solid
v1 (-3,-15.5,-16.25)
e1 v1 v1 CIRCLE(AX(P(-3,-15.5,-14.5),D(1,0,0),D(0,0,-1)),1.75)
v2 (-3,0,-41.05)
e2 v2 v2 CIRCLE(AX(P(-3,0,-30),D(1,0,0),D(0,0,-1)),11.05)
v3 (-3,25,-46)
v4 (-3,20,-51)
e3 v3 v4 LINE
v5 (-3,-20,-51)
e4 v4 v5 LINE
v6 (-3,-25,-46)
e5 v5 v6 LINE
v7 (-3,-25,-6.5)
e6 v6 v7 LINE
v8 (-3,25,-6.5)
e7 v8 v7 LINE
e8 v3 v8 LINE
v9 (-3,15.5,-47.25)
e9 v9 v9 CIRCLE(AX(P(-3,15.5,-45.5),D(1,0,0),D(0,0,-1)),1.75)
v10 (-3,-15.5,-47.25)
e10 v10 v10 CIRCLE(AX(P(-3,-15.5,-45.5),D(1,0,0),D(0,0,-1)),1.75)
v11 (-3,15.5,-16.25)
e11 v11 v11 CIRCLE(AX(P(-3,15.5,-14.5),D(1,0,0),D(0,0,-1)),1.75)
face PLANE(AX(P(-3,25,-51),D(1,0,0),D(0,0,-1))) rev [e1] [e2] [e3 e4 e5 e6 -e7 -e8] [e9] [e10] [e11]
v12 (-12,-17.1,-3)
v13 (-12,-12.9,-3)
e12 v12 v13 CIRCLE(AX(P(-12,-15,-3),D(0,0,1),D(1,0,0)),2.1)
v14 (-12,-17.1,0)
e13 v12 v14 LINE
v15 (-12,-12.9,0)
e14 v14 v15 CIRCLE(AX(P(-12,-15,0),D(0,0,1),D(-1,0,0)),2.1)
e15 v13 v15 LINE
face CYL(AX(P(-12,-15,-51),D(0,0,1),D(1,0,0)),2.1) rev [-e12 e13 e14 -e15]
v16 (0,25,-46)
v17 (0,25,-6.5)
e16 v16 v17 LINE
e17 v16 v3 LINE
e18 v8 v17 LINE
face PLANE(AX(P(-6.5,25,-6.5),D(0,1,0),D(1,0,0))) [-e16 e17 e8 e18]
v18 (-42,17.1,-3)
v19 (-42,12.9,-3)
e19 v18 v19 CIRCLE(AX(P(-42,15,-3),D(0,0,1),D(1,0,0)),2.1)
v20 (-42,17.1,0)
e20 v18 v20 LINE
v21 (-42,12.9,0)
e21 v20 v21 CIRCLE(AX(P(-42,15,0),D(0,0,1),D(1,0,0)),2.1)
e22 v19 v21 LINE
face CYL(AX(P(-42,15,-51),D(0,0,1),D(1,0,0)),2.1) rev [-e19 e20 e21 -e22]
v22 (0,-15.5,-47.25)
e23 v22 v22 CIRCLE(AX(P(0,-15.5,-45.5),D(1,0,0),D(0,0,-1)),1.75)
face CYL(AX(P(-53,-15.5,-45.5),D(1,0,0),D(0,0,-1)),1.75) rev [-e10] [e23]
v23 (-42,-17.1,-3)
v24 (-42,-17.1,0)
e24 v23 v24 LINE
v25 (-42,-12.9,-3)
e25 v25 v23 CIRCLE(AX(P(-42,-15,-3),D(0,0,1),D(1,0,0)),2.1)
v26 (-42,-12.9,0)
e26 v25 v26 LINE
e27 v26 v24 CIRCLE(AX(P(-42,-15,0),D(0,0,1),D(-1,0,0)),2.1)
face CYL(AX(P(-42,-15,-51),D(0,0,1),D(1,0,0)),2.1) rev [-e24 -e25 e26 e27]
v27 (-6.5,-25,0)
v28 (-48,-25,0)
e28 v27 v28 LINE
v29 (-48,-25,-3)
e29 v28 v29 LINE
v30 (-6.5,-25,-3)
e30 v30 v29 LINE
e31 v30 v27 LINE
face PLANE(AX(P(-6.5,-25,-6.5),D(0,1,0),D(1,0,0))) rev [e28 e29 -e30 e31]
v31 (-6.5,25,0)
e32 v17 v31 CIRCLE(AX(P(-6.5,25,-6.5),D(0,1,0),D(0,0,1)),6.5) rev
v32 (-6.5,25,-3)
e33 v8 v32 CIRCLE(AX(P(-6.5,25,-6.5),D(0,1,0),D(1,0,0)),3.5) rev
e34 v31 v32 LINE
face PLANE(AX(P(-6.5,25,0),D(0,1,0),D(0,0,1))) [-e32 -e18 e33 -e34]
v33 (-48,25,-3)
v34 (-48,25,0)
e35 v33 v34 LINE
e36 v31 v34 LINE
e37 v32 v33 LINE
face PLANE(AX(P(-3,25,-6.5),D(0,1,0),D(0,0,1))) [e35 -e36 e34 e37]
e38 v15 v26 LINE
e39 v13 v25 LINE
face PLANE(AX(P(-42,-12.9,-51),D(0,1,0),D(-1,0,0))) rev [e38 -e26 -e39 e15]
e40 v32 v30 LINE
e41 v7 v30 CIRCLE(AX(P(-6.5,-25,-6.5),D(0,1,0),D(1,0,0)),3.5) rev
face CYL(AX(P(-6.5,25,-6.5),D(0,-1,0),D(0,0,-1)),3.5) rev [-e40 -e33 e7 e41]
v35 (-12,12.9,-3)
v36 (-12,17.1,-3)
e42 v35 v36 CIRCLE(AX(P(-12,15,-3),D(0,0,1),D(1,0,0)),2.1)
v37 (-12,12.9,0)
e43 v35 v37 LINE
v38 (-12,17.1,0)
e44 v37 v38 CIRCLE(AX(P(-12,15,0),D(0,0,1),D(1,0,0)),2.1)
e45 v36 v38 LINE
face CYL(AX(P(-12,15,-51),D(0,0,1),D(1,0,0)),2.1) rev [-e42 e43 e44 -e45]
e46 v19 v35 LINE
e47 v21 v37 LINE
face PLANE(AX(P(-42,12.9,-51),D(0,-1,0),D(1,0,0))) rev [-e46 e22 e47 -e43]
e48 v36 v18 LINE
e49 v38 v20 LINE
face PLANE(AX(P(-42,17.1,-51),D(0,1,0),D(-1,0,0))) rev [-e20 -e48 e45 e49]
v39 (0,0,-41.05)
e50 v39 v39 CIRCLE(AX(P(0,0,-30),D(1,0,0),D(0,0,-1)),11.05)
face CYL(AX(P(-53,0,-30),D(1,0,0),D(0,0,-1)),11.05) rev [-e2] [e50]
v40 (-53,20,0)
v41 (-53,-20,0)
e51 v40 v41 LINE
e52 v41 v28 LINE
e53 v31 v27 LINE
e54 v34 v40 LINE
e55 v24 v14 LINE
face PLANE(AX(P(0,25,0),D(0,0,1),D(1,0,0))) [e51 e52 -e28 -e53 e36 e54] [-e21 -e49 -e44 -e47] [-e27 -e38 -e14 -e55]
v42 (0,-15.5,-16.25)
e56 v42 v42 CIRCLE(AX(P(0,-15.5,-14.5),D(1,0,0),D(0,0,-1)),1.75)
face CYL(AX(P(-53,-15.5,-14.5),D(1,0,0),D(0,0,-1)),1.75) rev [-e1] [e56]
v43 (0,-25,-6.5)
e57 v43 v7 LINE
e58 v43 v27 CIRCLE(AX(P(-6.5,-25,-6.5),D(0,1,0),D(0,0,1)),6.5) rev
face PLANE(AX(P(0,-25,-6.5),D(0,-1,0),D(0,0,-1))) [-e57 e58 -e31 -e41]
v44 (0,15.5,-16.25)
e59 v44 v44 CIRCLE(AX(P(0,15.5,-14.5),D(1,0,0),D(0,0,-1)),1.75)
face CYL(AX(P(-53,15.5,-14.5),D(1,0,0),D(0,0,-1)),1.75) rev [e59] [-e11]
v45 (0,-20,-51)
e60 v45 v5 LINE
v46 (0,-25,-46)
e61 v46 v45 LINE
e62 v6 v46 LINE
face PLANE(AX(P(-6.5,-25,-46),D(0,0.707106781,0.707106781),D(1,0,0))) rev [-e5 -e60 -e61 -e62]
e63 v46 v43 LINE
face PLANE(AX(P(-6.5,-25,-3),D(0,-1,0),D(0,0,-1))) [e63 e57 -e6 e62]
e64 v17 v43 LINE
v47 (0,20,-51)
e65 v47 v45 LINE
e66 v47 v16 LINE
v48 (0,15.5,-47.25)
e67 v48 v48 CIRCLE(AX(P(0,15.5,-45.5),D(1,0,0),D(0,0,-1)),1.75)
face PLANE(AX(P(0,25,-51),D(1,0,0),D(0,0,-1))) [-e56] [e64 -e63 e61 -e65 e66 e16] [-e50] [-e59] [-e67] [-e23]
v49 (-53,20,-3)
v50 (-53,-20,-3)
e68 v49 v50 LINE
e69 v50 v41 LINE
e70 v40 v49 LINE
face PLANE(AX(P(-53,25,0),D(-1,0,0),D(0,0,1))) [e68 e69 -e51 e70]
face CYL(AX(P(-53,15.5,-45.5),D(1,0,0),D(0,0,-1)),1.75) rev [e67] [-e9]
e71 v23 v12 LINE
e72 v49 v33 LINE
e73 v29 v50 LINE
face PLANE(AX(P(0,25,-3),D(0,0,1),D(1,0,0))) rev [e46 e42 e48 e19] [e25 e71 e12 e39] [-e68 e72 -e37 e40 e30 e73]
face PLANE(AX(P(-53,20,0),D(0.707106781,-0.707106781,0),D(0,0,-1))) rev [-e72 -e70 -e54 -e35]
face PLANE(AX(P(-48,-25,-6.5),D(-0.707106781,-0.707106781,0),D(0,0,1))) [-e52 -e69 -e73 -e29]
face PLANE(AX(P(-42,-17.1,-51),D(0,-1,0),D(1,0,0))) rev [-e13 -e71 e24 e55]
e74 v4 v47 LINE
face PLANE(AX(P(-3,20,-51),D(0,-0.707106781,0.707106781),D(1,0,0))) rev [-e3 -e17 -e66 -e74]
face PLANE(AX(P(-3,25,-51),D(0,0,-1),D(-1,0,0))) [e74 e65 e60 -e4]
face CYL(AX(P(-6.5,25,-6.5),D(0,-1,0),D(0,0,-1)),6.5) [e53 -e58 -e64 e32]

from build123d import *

# Parameters (mm, degrees)
BASE_FLANGE1_DEPTH = 25
CHAMFER1_SIZE      = 5
SKETCH7_R          = 11.05
SKETCH7_R_2        = 1.75
CUT_EXTRUDE1_DEPTH = 78.685262438
CUT_EXTRUDE2_DEPTH = 78.685262438


# Sheet-metal steps are written as plain solids
with BuildPart() as part:
    # Sketch2 → Base-Flange1 (new, symmetric)
    with BuildSketch(Plane(origin=(0, 0, 0), x_dir=(1, 0, 0), z_dir=(0, 1, 0))):
        with BuildLine():
            Line((0, 51), (0, 6.5))
            ThreePointArc((0, 6.5), (-1.903805922, 1.903805922), (-6.5, 0))
            Line((-6.5, 0), (-53, 0))
            Line((-53, 0), (-53, 3))
            Line((-53, 3), (-6.5, 3))
            ThreePointArc((-6.5, 3), (-4.025126266, 4.025126266), (-3, 6.5))
            Line((-3, 6.5), (-3, 51))
            Line((-3, 51), (0, 51))
        make_face()
    extrude(amount=BASE_FLANGE1_DEPTH, both=True)

    # Chamfer1
    chamfer1_edges = [part.edges().sort_by_distance(p)[0] for p in [
        (-1.5, 25, -51),
        (-53, 25, -1.5),
        (-1.5, -25, -51),
        (-53, -25, -1.5),
    ]]
    chamfer(chamfer1_edges, length=CHAMFER1_SIZE)

    # Sketch7 → Cut-Extrude1 (cut, through all)
    with BuildSketch(Plane(origin=(0, 0, 0), x_dir=(0, 0, -1), z_dir=(1, 0, 0))):
        with Locations((30, 0)):
            Circle(SKETCH7_R)
        with Locations((45.5, 15.5)):
            Circle(SKETCH7_R_2)
        with Locations((14.5, 15.5)):
            Circle(SKETCH7_R_2)
        with Locations((14.5, -15.5)):
            Circle(SKETCH7_R_2)
        with Locations((45.5, -15.5)):
            Circle(SKETCH7_R_2)
    extrude(amount=-CUT_EXTRUDE1_DEPTH, mode=Mode.SUBTRACT)

    # Sketch8 → Cut-Extrude2 (cut, through all)
    with BuildSketch(Plane.XY):
        with BuildLine():
            Line((-42, 17.1), (-12, 17.1))
            ThreePointArc((-12, 17.1), (-9.9, 15), (-12, 12.9))
            Line((-12, 12.9), (-42, 12.9))
            ThreePointArc((-42, 12.9), (-44.1, 15), (-42, 17.1))
        make_face()
        with BuildLine():
            Line((-42, -17.1), (-12, -17.1))
            ThreePointArc((-12, -17.1), (-9.9, -15), (-12, -12.9))
            Line((-12, -12.9), (-42, -12.9))
            ThreePointArc((-42, -12.9), (-44.1, -15), (-42, -17.1))
        make_face()
    extrude(amount=-CUT_EXTRUDE2_DEPTH, mode=Mode.SUBTRACT)


solid = part.part
